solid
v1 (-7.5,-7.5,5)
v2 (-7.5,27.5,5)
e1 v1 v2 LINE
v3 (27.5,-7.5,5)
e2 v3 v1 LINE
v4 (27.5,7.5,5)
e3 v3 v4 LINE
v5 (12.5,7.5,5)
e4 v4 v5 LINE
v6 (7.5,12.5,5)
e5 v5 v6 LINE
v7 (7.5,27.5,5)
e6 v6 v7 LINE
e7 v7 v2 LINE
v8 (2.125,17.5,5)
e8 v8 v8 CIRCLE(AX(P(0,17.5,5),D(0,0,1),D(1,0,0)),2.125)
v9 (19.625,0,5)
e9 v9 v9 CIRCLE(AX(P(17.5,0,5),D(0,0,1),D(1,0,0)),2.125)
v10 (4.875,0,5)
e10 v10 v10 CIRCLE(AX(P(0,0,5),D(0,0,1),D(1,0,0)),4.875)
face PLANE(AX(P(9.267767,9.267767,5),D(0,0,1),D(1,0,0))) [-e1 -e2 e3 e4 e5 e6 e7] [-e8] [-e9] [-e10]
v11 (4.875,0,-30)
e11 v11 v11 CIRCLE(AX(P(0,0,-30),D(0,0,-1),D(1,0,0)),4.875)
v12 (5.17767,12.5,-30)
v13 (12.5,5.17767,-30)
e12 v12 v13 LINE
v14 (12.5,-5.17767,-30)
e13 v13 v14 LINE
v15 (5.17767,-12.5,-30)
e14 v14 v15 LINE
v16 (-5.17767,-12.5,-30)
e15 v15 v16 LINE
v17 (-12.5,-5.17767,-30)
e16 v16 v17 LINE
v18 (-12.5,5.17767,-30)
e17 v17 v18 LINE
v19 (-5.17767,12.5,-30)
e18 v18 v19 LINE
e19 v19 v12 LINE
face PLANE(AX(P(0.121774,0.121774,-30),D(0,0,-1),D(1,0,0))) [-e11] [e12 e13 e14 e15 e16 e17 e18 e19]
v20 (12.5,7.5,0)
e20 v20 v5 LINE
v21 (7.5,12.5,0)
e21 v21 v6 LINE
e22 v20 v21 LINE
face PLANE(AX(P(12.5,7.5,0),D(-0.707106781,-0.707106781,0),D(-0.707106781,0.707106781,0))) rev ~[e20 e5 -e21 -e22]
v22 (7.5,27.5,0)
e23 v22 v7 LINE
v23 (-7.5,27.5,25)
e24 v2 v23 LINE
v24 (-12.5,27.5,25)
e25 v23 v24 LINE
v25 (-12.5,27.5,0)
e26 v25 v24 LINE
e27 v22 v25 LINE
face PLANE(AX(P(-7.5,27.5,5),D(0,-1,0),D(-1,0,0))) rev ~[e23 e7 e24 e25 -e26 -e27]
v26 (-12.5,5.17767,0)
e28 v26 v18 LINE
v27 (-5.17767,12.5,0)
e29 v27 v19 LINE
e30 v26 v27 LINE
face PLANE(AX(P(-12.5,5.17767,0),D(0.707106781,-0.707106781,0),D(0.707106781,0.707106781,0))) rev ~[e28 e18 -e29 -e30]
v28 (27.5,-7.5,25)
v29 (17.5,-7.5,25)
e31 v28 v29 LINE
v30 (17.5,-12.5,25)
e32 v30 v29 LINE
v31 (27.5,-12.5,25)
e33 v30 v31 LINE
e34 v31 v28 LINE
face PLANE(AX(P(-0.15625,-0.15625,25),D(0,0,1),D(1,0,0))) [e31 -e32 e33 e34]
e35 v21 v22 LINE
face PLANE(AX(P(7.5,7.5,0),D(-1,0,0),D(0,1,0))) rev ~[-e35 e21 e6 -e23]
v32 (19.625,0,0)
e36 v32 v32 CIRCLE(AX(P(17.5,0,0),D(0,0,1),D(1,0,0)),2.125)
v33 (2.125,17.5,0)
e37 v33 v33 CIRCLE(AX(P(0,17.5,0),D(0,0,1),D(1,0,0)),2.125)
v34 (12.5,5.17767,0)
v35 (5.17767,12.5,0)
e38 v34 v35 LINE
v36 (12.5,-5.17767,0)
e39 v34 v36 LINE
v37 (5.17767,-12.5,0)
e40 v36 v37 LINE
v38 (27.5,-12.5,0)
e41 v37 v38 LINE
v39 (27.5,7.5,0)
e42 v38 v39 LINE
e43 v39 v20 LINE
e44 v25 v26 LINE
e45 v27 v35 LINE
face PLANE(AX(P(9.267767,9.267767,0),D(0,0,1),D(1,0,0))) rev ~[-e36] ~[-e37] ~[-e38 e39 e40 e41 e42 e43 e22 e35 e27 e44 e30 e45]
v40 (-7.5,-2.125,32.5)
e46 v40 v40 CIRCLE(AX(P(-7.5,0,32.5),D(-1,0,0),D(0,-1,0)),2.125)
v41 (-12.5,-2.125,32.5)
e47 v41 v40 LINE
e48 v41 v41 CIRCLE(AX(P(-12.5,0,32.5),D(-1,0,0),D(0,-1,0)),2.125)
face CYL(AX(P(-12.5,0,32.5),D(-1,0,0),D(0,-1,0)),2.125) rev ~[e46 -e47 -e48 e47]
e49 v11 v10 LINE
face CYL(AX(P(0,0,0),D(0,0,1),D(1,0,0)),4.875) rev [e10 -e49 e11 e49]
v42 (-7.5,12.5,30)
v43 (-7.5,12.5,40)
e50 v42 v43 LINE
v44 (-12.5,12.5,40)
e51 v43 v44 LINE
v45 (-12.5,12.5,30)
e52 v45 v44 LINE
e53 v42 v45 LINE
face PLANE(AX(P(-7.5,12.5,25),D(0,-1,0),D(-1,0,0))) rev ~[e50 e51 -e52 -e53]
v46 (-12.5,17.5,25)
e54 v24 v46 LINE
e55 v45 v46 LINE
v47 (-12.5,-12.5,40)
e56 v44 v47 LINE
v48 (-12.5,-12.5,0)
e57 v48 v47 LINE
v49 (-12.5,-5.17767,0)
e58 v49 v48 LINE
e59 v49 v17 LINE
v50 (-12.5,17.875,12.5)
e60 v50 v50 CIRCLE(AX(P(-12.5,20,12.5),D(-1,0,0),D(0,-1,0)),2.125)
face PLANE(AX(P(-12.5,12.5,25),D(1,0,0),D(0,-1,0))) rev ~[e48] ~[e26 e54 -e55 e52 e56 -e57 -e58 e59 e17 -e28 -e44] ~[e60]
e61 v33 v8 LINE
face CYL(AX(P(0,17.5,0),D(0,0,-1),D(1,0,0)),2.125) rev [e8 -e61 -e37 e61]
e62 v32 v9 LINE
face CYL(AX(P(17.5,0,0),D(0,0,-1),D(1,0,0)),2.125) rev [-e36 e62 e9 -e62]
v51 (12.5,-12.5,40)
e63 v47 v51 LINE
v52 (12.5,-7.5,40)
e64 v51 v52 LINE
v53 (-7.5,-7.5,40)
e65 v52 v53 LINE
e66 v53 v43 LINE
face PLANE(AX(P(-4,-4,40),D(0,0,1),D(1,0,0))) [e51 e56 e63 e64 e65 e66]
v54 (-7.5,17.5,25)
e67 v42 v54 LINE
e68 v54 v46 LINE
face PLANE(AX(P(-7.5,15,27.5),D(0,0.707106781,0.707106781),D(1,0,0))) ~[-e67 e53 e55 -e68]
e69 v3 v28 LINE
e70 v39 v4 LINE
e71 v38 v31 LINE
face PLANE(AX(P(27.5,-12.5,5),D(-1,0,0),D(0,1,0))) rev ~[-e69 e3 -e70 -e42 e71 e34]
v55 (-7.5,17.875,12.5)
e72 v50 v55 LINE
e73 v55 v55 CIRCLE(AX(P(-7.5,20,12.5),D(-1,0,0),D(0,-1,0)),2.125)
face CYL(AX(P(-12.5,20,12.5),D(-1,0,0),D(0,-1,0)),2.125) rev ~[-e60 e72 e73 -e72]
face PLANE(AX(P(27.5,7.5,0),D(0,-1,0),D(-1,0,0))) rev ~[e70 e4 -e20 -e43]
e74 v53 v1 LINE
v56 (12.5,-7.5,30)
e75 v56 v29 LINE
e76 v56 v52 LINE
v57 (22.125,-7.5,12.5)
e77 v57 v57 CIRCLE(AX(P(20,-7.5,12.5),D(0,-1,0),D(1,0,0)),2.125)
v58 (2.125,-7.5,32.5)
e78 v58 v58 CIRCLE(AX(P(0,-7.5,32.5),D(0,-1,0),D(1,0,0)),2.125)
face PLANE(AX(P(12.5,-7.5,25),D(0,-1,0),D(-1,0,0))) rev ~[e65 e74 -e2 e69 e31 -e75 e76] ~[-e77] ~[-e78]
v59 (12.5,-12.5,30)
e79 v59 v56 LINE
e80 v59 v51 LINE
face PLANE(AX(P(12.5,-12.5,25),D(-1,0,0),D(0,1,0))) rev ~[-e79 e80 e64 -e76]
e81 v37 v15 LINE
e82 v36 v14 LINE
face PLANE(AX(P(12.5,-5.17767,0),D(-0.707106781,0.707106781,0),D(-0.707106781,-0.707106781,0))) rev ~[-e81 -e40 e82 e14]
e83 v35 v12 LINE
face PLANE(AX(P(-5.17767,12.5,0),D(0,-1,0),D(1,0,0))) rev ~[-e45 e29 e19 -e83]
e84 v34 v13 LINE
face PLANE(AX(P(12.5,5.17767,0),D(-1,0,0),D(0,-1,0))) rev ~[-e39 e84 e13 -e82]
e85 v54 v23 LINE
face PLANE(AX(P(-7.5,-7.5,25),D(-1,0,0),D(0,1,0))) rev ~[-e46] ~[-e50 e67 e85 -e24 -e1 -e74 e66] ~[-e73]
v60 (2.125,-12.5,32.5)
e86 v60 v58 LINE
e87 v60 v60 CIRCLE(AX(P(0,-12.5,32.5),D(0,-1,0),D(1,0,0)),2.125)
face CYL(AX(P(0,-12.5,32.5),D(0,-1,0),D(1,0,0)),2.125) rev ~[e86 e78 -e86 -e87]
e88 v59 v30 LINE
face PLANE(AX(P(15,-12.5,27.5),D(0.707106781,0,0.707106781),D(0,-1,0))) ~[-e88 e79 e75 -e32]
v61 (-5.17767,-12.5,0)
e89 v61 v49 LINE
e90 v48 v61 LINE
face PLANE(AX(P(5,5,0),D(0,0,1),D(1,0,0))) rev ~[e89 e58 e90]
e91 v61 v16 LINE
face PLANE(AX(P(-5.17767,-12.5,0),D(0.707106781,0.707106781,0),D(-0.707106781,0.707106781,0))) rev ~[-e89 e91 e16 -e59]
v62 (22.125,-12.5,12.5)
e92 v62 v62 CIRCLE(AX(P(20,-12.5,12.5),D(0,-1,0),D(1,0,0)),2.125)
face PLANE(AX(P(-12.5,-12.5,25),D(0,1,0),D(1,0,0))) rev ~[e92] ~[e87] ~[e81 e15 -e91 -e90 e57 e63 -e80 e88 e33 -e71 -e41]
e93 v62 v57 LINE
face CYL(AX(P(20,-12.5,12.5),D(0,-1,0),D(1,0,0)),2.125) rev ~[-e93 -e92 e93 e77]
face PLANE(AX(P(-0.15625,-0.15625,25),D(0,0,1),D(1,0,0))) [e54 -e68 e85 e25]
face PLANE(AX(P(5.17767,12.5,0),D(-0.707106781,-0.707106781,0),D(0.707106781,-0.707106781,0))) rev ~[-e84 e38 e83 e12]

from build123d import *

# Parameters (mm, degrees)
F0_R        = 4.875
F0_R_2      = 2.125
F1_DEPTH    = 5
F2_R        = 4.875
F3_DEPTH    = 30
F4_T1_DEPTH = 5
F6_DEPTH    = 20
F8_DEPTH    = 15
F9_R        = 2.125
F10_DEPTH   = 40.001
F11_R       = 2.125
F12_DEPTH   = 40.001
F13_SIZE    = 5


# Not quite as in the source:
# - a fillet or chamfer that OpenCascade refuses, or shapes differently, is made with other operations: its cross-section is extruded or revolved along the edge and cut away or added


with BuildPart() as f1:
    # F0 (on Top) → F1 (new body)
    with BuildSketch(Plane.XY):
        Polygon((-12.5, 27.5), (-12.5, 0), (-12.5, -12.5), (27.5, -12.5), (27.5, 7.5), (7.5, 7.5), (7.5, 27.5), align=None)
        Circle(F0_R, mode=Mode.SUBTRACT)
        with Locations((17.5, 0)):
            Circle(F0_R_2, mode=Mode.SUBTRACT)
        with Locations((0, 17.5)):
            Circle(F0_R_2, mode=Mode.SUBTRACT)
    extrude(amount=F1_DEPTH)

    # F2 (on face) → F3 (join)
    with BuildSketch(Plane(origin=(0, 0, 0), x_dir=(1, 0, 0), z_dir=(0, 0, -1))):
        Polygon((12.5, -5.1776695297), (12.5, 5.1776695297), (5.1776695297, 12.5), (-5.1776695297, 12.5), (-12.5, 5.1776695297), (-12.5, -5.1776695297), (-5.1776695297, -12.5), (5.1776695297, -12.5), (7.5, -10.1776695297), (7.5, -7.5), (10.1776695297, -7.5), align=None)
        Circle(F2_R, mode=Mode.SUBTRACT)
        Polygon((7.5, -10.1776695297), (10.1776695297, -7.5), (7.5, -7.5), align=None)
    extrude(amount=F3_DEPTH)

    # F4: chamfer of 5 on 1 edges, made by hand

    # F4_s2 → F4_t1 (join)
    with BuildSketch(Plane.XY):
        Polygon((12.5, 7.5), (7.5, 12.5), (7.5, 7.5), align=None)
    extrude(amount=F4_T1_DEPTH)

    # F5 (on face) → F6 (join)
    with BuildSketch(Plane.XY.offset(5)):
        Polygon((-7.5, 27.5), (-12.5, 27.5), (-12.5, -12.5), (27.5, -12.5), (27.5, -7.5), (-7.5, -7.5), align=None)
    extrude(amount=F6_DEPTH)

    # F7 (on face) → F8 (join)
    with BuildSketch(Plane.XY.offset(25)):
        Polygon((-7.5, 12.5), (-12.5, 12.5), (-12.5, -12.5), (12.5, -12.5), (12.5, -7.5), (-7.5, -7.5), align=None)
    extrude(amount=F8_DEPTH)

    # F9 (on face) → F10 (cut, through all)
    with BuildSketch(Plane.XZ.offset(12.5)):
        with Locations((20, 12.5)):
            Circle(F9_R)
        with Locations((0, 32.5)):
            Circle(F9_R)
    extrude(amount=-F10_DEPTH, mode=Mode.SUBTRACT)

    # F11 (on face) → F12 (cut, through all)
    with BuildSketch(Plane(origin=(-12.5, 0, 0), x_dir=(0, -1, 0), z_dir=(-1, 0, 0))):
        with Locations((-20, 12.5)):
            Circle(F11_R)
        with Locations((0, 32.5)):
            Circle(F11_R)
    extrude(amount=-F12_DEPTH, mode=Mode.SUBTRACT)

    # F13
    f13_edges = [f1.edges().sort_by_distance(p)[0] for p in [
        (12.5, -10, 25),
        (-10, 12.5, 25),
    ]]
    chamfer(f13_edges, length=F13_SIZE)


solid = f1.part
